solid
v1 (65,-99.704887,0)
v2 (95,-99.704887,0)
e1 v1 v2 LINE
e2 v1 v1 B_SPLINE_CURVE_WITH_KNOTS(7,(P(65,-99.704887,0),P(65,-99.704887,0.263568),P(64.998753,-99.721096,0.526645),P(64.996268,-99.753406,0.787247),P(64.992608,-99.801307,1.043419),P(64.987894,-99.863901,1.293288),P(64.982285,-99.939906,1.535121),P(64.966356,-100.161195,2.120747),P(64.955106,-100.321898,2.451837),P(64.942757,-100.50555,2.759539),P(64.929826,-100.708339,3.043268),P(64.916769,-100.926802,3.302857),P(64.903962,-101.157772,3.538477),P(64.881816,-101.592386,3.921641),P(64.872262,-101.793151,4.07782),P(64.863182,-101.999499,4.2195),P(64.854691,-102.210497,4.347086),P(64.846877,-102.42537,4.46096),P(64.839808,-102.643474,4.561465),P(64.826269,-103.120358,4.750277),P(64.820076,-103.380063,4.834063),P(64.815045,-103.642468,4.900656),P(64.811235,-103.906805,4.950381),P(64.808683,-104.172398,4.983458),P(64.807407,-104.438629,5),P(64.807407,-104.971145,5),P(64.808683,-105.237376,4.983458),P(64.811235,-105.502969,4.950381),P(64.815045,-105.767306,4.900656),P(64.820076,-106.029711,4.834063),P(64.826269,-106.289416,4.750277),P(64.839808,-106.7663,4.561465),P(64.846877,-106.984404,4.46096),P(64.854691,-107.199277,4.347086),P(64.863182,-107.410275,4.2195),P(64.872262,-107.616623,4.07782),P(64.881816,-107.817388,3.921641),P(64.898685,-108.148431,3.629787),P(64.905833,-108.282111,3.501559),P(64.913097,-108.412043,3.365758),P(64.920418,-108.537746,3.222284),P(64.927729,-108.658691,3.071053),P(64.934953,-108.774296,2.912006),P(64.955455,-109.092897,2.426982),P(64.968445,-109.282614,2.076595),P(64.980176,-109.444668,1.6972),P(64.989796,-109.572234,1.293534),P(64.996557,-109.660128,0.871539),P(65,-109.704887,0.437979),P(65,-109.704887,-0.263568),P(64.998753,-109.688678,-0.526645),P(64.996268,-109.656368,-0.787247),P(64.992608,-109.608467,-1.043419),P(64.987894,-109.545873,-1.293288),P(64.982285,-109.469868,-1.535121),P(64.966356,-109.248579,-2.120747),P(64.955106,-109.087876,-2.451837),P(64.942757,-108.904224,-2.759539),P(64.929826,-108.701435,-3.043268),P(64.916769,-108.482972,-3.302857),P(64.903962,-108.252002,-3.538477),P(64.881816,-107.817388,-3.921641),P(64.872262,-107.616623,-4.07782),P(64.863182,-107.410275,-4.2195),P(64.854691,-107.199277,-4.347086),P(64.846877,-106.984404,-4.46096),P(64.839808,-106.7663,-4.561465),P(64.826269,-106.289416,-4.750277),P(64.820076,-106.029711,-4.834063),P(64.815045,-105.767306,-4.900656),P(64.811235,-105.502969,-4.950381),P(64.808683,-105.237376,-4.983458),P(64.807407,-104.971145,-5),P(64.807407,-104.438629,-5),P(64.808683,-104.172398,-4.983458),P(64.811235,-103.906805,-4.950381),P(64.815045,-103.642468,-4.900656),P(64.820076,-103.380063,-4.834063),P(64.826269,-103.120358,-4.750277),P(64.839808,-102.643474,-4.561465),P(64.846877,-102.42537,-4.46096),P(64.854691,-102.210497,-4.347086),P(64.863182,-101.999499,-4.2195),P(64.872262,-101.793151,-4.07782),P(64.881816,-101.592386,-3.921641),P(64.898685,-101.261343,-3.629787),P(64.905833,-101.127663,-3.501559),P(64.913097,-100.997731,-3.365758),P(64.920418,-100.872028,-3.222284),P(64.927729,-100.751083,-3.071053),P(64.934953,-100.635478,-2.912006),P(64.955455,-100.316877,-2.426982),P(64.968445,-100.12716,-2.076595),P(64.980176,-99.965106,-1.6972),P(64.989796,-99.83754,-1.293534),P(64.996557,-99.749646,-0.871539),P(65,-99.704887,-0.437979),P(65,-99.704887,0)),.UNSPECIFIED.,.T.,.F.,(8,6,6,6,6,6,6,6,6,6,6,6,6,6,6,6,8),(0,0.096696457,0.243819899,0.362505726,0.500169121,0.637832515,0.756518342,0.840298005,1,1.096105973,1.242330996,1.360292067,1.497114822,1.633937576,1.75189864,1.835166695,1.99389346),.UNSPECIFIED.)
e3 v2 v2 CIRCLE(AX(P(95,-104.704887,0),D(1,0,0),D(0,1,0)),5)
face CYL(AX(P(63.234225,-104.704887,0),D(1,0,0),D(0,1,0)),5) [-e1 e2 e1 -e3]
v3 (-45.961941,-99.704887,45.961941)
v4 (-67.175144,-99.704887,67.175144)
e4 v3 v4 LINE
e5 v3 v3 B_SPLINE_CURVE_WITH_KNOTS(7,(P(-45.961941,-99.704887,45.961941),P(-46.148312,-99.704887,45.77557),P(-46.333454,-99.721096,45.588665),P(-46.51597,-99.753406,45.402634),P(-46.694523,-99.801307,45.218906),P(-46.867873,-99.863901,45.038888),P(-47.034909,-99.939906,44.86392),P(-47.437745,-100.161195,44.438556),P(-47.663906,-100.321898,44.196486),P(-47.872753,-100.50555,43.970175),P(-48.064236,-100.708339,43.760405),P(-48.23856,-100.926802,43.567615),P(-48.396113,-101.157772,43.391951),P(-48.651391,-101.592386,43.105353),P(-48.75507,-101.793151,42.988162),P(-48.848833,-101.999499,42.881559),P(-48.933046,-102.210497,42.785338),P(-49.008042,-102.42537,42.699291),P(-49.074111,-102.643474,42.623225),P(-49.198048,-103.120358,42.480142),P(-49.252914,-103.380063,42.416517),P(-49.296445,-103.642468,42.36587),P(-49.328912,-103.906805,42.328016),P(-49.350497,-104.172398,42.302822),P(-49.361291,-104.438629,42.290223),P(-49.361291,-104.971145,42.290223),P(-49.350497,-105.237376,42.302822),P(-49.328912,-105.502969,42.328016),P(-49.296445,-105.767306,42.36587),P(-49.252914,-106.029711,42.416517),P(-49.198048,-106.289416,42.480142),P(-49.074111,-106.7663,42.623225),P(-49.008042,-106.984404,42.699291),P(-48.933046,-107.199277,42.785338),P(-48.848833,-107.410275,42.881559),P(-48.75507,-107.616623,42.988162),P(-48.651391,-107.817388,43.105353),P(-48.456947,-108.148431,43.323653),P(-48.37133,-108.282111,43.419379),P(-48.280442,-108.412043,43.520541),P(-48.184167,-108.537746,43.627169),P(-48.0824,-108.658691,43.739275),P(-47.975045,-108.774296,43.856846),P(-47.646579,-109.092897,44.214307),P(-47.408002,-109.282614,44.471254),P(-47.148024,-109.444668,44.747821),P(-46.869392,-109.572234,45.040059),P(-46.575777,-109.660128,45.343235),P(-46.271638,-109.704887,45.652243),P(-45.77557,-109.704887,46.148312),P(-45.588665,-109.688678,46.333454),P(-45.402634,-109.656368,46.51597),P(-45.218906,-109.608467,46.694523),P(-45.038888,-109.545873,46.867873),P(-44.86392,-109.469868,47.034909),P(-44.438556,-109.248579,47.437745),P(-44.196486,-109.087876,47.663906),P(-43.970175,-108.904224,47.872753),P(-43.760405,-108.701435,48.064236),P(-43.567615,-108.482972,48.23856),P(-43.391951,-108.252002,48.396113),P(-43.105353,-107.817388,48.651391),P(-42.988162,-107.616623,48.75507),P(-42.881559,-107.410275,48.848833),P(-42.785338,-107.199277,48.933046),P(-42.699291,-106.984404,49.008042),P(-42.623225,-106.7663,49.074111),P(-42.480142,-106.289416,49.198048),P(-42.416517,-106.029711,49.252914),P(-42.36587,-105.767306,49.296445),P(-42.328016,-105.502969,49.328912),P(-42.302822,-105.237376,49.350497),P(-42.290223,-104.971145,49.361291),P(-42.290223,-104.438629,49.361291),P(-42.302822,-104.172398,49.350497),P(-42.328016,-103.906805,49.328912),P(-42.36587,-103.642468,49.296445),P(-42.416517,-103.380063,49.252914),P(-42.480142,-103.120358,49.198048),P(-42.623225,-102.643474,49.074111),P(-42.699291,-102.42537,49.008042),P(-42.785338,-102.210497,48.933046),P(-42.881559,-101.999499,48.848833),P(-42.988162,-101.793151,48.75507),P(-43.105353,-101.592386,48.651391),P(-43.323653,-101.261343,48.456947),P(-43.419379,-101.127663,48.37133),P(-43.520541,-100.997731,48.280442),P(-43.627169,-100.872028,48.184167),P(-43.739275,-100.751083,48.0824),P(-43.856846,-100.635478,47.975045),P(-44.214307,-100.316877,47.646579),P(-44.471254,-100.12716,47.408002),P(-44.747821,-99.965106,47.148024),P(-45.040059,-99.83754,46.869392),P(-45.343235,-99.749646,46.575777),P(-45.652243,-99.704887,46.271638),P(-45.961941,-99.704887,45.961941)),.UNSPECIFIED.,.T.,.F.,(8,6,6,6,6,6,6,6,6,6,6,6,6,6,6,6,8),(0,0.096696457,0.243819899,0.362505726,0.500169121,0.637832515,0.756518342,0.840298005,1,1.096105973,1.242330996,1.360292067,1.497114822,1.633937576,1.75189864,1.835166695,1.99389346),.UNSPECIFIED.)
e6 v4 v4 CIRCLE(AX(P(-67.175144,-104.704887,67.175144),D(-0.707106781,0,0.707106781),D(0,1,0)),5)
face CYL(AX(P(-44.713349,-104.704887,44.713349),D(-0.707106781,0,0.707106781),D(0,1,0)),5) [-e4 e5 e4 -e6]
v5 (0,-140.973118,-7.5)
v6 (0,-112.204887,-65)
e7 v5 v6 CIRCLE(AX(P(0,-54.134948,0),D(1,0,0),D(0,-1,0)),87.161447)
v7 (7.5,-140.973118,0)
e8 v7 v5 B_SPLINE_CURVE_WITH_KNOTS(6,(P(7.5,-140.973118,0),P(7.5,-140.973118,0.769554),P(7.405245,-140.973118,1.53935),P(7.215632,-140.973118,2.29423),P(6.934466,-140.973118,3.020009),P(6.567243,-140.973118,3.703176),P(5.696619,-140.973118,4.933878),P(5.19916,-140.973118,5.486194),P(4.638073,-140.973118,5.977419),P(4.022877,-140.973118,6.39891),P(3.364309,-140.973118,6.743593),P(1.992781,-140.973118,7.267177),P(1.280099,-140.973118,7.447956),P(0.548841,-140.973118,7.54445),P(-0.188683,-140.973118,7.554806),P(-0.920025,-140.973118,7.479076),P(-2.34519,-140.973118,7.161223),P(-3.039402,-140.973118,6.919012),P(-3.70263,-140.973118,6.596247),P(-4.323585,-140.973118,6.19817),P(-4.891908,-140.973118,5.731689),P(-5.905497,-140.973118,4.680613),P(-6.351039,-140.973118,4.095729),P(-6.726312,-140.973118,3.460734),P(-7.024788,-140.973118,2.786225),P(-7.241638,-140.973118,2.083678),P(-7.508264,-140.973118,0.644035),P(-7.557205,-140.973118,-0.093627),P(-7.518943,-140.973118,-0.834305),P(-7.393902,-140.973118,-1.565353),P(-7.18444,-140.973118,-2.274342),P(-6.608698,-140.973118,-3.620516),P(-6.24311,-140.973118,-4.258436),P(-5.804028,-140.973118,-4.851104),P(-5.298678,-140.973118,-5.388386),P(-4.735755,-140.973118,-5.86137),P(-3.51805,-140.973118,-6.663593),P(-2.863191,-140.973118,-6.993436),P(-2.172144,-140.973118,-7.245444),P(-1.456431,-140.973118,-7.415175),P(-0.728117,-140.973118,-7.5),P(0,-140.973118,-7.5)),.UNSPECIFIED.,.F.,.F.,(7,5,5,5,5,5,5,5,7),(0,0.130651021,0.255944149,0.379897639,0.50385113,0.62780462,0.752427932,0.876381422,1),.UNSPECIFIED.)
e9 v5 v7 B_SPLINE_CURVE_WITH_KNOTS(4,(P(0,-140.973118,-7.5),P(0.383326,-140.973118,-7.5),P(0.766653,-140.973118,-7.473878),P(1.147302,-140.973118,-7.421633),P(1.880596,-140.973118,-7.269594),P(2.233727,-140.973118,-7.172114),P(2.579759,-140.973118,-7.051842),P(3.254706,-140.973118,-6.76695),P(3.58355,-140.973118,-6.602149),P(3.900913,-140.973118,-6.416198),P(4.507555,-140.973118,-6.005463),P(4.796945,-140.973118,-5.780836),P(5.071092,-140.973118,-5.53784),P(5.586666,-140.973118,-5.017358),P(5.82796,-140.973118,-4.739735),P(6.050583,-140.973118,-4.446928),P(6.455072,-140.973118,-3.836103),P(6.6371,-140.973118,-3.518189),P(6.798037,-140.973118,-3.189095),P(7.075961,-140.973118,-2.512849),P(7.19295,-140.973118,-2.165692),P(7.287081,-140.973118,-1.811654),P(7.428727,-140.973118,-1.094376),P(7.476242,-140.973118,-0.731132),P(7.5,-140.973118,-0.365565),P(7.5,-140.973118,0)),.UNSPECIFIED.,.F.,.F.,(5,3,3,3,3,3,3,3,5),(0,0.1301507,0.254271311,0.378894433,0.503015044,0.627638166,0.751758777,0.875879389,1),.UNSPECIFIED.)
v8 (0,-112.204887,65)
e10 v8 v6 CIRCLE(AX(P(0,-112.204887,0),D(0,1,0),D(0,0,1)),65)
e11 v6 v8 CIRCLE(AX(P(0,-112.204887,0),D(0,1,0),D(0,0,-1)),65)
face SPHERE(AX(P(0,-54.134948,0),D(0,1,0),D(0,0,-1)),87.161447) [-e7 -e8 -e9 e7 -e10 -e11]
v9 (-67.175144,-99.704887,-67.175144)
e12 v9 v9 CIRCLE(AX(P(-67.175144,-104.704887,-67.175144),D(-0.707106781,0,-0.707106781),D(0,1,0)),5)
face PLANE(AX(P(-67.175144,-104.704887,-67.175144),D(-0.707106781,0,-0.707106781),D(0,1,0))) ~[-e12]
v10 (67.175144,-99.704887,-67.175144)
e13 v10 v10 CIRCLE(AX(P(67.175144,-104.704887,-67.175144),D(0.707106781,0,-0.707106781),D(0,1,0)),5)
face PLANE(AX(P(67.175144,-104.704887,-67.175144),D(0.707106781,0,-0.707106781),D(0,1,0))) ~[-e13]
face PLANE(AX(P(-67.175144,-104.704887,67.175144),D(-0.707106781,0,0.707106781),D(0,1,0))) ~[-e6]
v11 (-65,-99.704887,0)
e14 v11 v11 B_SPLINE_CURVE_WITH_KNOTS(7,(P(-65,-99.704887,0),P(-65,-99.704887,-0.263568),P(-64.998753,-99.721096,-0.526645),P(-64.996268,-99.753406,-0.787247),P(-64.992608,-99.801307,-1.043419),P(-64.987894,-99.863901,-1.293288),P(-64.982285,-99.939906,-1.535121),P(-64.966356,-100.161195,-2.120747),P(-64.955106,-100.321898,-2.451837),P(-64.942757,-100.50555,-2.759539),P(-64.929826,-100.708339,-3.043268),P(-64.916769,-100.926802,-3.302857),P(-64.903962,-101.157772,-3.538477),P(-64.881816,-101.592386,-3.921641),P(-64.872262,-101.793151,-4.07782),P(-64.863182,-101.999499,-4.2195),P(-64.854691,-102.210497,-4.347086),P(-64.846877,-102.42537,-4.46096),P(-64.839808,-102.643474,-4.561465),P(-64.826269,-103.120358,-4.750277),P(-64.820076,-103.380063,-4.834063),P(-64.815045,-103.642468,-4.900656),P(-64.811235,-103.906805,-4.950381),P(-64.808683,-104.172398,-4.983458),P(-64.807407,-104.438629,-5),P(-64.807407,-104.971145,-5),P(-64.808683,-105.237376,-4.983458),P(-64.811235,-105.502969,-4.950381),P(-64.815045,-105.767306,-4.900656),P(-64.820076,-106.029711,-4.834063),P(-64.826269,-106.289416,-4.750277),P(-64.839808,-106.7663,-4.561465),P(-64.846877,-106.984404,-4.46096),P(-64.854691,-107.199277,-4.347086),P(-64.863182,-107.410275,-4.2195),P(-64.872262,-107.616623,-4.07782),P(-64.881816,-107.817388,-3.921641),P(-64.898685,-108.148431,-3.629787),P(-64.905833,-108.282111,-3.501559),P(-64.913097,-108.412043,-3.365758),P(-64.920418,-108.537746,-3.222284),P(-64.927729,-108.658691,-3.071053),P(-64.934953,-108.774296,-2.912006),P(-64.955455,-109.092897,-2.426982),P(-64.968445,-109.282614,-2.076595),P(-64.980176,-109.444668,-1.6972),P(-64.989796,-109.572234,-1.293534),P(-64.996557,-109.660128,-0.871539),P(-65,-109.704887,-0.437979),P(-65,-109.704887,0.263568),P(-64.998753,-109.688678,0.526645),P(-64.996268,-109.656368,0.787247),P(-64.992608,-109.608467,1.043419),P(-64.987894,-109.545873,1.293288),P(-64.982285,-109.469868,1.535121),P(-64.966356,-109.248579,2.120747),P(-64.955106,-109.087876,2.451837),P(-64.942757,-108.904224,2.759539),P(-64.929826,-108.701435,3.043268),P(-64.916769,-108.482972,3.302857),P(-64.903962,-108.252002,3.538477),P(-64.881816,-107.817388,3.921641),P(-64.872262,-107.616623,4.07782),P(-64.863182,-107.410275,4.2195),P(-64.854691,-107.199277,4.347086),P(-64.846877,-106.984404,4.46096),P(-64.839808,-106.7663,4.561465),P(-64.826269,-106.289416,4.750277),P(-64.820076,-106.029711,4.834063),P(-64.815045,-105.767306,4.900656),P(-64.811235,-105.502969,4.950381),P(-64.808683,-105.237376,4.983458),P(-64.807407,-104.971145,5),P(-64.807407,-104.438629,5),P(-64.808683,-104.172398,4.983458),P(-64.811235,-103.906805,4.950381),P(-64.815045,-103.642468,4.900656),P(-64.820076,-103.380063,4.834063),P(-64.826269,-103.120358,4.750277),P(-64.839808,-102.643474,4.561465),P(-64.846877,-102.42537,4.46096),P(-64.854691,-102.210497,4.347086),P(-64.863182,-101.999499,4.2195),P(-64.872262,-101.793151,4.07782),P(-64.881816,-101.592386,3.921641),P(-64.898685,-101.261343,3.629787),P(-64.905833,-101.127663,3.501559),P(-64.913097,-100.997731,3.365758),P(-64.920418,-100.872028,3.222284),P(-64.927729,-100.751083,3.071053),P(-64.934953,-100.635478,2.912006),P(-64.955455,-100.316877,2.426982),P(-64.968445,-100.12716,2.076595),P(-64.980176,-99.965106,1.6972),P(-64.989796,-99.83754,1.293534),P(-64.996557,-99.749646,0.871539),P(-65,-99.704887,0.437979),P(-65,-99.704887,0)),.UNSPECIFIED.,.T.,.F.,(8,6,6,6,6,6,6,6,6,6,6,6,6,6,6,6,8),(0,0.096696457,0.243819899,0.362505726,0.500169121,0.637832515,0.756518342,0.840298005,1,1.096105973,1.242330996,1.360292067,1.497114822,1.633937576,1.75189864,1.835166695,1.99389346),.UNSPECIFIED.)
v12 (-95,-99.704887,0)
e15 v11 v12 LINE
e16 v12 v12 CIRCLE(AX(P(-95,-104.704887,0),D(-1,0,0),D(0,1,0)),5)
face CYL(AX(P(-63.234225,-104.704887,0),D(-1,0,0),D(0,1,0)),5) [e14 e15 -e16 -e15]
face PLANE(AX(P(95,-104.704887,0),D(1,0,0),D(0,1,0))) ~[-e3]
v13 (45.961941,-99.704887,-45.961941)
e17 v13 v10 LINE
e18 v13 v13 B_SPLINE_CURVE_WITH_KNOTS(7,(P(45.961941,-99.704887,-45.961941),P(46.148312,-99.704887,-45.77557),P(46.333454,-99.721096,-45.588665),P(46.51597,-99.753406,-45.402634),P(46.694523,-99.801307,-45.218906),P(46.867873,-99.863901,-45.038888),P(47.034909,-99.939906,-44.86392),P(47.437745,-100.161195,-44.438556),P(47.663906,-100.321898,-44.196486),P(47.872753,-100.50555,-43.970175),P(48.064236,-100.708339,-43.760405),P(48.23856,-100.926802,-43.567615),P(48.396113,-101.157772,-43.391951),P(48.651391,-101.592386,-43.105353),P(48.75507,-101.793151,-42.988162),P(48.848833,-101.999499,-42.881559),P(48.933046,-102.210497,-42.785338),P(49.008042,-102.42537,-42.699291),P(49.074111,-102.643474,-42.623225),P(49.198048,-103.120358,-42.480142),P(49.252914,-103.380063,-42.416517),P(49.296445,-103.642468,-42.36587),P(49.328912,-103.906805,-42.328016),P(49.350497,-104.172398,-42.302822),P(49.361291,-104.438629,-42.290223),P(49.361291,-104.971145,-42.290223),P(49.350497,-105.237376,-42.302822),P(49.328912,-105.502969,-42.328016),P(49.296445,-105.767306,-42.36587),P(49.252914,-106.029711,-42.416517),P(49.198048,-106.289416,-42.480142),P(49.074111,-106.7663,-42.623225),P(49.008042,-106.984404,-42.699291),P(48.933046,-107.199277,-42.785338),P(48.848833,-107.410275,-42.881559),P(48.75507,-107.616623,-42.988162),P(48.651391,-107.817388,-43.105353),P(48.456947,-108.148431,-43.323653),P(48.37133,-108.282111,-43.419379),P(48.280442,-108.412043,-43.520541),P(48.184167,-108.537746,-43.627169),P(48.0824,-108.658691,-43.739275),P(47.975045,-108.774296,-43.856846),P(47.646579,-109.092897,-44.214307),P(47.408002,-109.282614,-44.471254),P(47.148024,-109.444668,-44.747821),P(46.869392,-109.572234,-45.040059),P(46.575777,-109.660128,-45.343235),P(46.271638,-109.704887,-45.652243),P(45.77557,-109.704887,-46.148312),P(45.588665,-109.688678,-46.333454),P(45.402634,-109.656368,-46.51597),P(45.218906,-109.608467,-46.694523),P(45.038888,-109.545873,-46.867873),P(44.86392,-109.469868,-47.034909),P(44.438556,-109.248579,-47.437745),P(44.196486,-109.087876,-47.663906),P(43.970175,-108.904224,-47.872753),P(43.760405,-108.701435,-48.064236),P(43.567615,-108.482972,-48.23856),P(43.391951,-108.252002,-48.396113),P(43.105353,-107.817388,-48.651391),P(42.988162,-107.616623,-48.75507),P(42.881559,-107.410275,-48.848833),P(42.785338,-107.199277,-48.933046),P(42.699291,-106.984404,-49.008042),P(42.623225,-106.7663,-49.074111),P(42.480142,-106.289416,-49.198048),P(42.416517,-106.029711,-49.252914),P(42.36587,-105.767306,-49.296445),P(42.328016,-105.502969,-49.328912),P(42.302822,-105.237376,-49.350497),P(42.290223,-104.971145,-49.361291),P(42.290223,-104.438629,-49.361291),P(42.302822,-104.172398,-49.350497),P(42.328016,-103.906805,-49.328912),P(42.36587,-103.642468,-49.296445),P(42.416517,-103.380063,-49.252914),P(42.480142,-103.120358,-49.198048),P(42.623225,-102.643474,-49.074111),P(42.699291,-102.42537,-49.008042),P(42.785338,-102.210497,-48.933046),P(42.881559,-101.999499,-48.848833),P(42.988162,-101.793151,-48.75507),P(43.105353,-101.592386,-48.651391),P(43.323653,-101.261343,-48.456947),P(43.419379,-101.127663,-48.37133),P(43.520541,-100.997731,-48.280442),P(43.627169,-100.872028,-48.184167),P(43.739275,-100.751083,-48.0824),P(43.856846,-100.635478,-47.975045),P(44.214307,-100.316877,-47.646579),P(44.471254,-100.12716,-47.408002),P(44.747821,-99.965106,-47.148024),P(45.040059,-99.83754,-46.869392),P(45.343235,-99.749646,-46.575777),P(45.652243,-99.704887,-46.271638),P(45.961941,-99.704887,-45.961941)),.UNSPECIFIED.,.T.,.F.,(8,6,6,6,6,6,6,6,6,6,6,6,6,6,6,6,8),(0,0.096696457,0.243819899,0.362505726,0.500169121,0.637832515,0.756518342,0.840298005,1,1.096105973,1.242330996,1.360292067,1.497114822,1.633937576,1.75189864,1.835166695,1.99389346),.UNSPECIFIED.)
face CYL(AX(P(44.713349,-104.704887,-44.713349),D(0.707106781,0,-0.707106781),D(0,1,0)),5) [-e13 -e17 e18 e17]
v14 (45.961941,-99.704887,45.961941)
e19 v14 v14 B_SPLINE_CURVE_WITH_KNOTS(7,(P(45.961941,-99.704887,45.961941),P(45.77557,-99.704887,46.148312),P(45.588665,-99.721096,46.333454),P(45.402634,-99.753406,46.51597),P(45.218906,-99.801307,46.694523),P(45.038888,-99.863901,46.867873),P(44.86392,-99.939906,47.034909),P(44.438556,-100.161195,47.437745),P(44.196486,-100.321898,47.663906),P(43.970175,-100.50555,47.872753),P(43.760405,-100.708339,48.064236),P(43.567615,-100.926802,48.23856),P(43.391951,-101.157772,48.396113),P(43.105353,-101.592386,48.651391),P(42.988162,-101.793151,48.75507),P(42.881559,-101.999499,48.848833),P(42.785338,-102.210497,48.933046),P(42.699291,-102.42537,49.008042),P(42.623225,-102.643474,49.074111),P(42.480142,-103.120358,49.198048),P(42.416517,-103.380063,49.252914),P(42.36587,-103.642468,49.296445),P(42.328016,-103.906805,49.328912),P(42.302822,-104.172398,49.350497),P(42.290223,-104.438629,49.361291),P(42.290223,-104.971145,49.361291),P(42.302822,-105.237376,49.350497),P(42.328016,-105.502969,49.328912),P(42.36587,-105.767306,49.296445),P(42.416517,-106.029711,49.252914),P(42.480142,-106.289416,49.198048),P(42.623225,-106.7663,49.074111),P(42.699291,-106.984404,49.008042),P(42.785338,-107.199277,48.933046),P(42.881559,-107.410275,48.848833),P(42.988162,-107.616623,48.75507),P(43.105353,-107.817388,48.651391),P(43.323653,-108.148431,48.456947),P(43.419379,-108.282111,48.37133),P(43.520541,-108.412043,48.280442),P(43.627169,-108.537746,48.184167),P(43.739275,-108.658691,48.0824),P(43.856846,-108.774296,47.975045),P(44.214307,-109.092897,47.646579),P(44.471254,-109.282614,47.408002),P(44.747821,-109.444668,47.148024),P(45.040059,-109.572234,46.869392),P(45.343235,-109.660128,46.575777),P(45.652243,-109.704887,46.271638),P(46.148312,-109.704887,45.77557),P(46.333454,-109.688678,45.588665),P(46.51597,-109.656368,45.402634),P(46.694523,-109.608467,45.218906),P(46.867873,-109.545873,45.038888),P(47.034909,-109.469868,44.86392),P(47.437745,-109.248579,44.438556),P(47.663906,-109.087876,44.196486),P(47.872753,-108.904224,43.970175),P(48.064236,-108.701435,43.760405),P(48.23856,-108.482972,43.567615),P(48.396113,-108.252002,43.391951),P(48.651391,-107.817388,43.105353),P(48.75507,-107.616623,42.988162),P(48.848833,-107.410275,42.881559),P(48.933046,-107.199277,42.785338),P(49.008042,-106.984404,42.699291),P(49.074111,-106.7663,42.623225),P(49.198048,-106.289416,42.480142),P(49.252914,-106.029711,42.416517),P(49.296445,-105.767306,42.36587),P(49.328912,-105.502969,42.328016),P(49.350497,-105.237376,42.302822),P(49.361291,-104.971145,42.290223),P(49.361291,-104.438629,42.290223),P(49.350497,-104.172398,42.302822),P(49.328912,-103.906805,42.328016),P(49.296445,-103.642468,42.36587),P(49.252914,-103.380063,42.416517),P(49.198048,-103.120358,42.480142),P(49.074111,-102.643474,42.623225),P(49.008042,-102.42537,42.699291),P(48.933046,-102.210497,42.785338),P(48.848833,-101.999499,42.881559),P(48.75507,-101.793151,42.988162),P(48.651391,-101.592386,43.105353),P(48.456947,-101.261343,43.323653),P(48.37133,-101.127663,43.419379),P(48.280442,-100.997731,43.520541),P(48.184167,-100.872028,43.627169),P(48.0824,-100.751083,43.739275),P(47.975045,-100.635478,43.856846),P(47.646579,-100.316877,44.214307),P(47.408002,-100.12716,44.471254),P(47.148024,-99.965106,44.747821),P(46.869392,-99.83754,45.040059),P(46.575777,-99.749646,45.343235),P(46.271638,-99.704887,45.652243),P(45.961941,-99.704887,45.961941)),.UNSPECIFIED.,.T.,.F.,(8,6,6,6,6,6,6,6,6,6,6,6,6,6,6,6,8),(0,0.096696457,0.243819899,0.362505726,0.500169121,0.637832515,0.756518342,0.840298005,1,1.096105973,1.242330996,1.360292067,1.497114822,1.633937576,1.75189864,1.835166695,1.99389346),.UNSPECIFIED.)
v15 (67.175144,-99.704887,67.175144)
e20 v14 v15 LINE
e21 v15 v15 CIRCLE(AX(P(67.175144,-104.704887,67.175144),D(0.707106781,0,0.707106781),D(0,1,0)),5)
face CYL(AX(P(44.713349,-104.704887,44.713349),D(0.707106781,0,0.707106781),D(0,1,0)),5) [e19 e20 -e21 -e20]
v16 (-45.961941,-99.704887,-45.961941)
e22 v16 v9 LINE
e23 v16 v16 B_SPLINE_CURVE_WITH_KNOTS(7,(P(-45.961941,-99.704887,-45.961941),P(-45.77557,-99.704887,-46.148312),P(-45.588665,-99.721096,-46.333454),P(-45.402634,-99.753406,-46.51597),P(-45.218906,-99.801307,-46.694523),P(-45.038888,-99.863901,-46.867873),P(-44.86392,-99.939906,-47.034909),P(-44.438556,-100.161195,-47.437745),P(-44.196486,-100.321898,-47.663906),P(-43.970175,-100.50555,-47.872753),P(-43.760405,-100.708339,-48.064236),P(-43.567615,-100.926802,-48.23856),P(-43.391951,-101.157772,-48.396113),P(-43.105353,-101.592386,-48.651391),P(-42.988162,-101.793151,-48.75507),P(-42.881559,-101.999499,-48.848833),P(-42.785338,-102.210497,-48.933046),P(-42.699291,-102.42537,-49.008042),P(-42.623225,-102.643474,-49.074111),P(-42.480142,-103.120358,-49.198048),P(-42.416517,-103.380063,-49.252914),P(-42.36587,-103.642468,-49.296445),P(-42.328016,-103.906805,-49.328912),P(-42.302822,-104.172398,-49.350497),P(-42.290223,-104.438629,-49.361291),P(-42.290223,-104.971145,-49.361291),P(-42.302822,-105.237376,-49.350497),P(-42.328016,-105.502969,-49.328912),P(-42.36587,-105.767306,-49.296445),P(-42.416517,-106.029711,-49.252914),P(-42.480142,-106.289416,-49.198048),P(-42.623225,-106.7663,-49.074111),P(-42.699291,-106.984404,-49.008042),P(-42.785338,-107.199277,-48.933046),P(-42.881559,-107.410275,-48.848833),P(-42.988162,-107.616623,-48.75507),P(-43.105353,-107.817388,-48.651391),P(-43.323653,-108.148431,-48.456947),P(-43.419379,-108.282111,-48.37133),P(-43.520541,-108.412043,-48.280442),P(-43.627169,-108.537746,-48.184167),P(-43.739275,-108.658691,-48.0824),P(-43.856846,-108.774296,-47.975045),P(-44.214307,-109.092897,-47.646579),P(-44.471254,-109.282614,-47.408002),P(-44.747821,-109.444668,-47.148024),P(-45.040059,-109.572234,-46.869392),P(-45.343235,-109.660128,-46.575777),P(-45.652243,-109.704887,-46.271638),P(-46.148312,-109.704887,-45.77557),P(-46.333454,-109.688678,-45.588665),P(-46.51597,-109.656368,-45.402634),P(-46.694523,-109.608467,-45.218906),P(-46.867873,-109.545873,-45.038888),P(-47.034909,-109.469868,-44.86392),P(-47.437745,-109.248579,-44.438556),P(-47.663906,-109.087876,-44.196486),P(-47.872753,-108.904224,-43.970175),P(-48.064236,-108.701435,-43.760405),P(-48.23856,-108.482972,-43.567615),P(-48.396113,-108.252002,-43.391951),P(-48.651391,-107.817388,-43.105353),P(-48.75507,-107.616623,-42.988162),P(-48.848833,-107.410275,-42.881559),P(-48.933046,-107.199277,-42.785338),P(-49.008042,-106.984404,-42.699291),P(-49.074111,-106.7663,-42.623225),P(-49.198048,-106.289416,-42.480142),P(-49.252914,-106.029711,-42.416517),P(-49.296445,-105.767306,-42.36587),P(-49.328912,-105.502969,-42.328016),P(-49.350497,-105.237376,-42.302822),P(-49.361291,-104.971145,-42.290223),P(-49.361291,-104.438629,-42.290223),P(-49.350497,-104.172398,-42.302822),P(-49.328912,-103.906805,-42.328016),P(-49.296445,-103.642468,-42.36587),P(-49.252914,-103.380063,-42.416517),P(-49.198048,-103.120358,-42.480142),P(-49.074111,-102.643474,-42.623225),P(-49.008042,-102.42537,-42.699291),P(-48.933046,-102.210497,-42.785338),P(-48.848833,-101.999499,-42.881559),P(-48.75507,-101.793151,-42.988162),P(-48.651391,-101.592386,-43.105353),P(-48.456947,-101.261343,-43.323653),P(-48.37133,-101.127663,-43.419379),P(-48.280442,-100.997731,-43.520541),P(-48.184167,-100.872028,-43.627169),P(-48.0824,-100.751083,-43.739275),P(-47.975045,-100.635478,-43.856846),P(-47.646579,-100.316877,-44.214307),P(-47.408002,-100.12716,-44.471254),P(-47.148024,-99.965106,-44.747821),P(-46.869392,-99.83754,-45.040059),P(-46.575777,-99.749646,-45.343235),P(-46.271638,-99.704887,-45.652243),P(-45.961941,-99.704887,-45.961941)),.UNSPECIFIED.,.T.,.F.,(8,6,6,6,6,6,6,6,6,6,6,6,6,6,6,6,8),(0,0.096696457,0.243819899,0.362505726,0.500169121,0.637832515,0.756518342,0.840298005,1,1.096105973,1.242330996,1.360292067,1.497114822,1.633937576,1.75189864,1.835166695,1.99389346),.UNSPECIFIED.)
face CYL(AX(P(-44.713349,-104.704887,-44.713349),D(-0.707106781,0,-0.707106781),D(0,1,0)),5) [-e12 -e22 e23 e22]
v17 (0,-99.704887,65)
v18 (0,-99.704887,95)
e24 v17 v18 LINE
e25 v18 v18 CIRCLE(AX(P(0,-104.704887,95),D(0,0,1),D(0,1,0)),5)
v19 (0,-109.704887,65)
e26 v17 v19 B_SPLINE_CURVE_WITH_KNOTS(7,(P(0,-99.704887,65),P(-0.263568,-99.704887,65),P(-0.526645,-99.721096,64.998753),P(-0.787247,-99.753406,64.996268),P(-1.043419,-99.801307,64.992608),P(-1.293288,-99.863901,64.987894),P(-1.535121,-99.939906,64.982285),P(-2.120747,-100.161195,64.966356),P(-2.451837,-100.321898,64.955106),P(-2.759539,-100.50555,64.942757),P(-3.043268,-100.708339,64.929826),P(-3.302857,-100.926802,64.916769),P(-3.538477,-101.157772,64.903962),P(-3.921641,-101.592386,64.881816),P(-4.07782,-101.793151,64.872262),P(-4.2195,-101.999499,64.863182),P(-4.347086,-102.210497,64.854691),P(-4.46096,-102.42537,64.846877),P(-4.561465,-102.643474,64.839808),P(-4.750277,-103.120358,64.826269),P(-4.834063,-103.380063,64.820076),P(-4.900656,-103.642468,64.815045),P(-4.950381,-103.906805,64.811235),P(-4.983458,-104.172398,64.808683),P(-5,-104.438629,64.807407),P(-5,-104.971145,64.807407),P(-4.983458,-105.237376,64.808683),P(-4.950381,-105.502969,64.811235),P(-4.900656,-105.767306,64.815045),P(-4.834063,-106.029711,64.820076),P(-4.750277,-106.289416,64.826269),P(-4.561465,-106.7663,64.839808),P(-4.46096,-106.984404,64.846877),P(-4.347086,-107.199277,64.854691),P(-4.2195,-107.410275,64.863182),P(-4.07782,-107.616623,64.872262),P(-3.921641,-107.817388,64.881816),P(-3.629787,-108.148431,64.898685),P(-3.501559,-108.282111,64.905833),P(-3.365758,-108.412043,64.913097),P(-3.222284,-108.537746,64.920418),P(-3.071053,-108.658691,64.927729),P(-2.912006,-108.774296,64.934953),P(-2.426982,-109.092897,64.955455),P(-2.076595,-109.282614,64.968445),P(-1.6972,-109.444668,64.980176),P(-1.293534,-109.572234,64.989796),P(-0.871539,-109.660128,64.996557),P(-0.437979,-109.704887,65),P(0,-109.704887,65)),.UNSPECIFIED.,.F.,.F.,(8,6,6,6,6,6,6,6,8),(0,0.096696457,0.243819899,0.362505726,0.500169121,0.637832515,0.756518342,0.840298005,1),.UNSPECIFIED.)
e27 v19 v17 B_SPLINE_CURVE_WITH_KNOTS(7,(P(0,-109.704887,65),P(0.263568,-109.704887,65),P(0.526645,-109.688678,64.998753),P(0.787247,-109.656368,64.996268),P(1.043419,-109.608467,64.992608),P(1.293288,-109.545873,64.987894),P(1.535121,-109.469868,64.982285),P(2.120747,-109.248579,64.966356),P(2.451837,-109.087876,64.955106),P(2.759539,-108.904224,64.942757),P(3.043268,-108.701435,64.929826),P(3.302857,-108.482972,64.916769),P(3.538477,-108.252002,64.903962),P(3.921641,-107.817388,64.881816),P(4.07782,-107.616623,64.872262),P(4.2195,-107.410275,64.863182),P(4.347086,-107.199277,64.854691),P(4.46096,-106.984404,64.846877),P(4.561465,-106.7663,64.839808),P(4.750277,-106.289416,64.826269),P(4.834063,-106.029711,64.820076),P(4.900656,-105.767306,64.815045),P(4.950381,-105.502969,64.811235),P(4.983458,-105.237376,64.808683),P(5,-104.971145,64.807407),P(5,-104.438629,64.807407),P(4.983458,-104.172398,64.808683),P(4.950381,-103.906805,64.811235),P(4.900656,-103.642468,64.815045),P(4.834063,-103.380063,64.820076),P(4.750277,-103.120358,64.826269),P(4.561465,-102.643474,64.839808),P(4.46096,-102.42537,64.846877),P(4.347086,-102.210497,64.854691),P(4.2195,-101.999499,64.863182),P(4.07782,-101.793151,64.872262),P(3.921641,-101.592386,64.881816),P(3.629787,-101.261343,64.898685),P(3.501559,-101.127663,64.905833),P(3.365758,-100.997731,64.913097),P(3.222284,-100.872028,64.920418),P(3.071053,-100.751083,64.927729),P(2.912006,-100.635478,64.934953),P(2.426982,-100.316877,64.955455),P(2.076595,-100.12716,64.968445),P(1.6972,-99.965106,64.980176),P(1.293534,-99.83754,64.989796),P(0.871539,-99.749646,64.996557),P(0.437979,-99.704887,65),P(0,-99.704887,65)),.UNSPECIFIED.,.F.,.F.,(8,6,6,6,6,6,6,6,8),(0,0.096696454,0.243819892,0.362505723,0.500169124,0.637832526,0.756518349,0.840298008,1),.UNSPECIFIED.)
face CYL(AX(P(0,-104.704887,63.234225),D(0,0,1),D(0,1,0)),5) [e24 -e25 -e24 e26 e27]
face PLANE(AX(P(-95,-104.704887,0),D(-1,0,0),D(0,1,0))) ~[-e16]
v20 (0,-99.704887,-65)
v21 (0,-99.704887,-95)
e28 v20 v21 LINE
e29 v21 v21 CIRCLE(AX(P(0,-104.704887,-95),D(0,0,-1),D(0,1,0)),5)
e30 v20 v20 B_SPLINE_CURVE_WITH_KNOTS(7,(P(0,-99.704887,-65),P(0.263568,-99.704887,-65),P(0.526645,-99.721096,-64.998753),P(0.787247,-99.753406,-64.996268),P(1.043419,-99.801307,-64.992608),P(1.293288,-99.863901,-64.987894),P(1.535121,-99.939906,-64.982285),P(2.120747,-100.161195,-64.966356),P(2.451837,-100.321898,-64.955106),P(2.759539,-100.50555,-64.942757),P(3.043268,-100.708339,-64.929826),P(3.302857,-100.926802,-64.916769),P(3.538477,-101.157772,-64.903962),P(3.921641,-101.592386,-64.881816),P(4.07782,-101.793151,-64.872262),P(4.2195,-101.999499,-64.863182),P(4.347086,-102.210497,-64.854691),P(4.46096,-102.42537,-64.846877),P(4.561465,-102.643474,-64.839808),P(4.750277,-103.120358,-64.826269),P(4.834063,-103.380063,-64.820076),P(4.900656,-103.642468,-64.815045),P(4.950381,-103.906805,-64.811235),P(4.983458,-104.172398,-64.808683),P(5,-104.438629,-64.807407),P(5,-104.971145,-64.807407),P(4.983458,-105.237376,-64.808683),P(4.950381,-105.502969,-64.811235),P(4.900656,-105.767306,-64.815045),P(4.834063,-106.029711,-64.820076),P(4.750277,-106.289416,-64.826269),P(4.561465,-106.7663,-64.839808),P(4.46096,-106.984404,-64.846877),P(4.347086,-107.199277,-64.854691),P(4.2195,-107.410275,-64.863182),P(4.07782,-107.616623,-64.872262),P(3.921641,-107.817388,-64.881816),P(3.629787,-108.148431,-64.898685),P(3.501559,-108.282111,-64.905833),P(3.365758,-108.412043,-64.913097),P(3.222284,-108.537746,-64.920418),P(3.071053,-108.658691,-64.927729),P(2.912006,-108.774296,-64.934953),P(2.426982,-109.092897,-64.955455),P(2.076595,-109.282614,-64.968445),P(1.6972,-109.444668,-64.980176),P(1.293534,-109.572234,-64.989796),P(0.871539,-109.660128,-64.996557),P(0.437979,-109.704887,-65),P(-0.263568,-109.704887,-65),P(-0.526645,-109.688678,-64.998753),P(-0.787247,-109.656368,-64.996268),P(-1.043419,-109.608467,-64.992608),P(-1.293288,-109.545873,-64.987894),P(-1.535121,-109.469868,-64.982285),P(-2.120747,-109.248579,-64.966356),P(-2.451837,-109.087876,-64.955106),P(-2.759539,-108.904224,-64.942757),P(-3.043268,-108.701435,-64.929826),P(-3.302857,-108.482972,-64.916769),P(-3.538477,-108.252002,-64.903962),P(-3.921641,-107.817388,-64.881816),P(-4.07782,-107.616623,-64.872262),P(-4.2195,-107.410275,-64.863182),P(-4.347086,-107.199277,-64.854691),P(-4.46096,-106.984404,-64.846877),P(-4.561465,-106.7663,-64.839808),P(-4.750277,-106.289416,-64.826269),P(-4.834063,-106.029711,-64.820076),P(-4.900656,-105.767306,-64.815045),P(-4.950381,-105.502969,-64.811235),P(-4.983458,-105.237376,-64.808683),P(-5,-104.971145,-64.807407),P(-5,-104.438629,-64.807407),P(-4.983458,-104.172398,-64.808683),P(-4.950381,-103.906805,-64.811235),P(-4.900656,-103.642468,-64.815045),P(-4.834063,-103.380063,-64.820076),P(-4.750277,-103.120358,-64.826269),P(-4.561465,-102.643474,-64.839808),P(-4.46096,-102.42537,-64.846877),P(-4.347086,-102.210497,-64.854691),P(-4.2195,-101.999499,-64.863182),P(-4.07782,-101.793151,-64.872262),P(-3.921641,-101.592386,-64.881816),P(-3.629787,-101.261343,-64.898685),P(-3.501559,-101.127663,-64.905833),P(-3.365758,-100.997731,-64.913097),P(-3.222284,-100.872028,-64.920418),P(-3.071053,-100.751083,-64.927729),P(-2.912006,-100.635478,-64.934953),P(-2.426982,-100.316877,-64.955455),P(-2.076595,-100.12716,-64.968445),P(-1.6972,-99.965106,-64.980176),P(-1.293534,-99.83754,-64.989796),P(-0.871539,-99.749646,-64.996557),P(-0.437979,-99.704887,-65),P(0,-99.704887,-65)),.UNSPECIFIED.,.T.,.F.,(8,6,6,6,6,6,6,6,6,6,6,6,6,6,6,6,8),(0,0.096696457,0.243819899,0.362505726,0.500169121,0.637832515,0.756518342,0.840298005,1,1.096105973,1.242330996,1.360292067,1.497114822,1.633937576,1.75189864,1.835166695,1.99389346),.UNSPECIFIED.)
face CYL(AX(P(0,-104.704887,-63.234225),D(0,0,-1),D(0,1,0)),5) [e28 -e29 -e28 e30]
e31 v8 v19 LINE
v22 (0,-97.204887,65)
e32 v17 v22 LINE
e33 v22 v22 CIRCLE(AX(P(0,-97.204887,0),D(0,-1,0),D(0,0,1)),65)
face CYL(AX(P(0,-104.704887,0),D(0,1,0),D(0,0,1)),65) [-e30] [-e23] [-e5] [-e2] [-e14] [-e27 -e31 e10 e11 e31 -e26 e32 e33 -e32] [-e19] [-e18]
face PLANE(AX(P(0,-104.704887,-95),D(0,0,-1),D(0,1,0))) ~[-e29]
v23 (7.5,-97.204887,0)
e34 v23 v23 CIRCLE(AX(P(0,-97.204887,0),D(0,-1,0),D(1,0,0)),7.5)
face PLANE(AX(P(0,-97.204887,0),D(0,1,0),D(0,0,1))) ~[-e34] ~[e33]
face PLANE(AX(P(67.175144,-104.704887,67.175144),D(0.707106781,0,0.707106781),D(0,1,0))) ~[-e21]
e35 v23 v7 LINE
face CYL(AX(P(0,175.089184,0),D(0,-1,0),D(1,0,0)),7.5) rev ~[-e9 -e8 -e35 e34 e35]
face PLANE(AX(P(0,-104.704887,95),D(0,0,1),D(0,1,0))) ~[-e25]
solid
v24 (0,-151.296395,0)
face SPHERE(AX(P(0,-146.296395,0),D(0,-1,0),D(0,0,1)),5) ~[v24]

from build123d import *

# Parameters (mm, degrees)
F0_W     = 15
F0_H     = 65
F6_W     = 5
F6_H     = 30
F6_H_2   = 1.7657750845
F8_COUNT = 8
F10_D    = 15


with BuildPart() as f1:
    # F0 (on Right) → F1 (revolve)
    with BuildSketch(Plane.YZ):
        with Locations((-104.7048869729, 32.5)):
            Rectangle(F0_W, F0_H)
    revolve(axis=Axis((0, -59.3888796866, 0), (0, 1, 0)))

    # F2 (on Right) → F3 (revolve)
    with BuildSketch(Plane.YZ):
        with BuildLine():
            ThreePointArc((-141.2963948166, 0), (-133.6917758296, -35.6065858677), (-112.2048869729, -65))
            Line((-112.2048869729, -65), (-112.2048869729, 0))
            Line((-112.2048869729, 0), (-141.2963948166, 0))
        make_face()
    revolve(axis=Axis((0, -59.3888796866, 0), (0, 1, 0)))

    # F6 (on Right) → F7 (revolve)
    with BuildSketch(Plane.YZ):
        with Locations((-102.2048869729, 80)):
            Rectangle(F6_W, F6_H)
        with Locations((-102.2048869729, 64.1171124578)):
            Rectangle(F6_W, F6_H_2)
    revolve(axis=Axis((0, -104.7048869729, 87.7374348044), (0, 0, 1)))

    # F8: F1 ×8 about axis
    f8_axis = Axis((0, -59.3888796866, 0), (0, 1, 0))


with BuildPart() as f5:
    # F4 (on Right) → F5 (revolve)
    with BuildSketch(Plane.YZ):
        with BuildLine():
            Line((-151.2963948166, 0), (-141.2963948166, 0))
            ThreePointArc((-141.2963948166, 0), (-146.2963948166, 5), (-151.2963948166, 0))
        make_face()
    revolve(axis=Axis((0, -59.3888796866, 0), (0, 1, 0)))


with BuildPart() as f1_1:
    add(f1.part)
    for i in range(1, F8_COUNT):
        add(f1.part.rotate(f8_axis, i * 360 / F8_COUNT))

    # F10 (through all)
    with Locations(Plane(origin=(0, -97.2048869729, 0), x_dir=(-1, 0, 0), z_dir=(0, 1, 0))):
        with Locations((0, 0)):
            Hole(F10_D / 2)


solid = Compound([f5.part, f1_1.part])
